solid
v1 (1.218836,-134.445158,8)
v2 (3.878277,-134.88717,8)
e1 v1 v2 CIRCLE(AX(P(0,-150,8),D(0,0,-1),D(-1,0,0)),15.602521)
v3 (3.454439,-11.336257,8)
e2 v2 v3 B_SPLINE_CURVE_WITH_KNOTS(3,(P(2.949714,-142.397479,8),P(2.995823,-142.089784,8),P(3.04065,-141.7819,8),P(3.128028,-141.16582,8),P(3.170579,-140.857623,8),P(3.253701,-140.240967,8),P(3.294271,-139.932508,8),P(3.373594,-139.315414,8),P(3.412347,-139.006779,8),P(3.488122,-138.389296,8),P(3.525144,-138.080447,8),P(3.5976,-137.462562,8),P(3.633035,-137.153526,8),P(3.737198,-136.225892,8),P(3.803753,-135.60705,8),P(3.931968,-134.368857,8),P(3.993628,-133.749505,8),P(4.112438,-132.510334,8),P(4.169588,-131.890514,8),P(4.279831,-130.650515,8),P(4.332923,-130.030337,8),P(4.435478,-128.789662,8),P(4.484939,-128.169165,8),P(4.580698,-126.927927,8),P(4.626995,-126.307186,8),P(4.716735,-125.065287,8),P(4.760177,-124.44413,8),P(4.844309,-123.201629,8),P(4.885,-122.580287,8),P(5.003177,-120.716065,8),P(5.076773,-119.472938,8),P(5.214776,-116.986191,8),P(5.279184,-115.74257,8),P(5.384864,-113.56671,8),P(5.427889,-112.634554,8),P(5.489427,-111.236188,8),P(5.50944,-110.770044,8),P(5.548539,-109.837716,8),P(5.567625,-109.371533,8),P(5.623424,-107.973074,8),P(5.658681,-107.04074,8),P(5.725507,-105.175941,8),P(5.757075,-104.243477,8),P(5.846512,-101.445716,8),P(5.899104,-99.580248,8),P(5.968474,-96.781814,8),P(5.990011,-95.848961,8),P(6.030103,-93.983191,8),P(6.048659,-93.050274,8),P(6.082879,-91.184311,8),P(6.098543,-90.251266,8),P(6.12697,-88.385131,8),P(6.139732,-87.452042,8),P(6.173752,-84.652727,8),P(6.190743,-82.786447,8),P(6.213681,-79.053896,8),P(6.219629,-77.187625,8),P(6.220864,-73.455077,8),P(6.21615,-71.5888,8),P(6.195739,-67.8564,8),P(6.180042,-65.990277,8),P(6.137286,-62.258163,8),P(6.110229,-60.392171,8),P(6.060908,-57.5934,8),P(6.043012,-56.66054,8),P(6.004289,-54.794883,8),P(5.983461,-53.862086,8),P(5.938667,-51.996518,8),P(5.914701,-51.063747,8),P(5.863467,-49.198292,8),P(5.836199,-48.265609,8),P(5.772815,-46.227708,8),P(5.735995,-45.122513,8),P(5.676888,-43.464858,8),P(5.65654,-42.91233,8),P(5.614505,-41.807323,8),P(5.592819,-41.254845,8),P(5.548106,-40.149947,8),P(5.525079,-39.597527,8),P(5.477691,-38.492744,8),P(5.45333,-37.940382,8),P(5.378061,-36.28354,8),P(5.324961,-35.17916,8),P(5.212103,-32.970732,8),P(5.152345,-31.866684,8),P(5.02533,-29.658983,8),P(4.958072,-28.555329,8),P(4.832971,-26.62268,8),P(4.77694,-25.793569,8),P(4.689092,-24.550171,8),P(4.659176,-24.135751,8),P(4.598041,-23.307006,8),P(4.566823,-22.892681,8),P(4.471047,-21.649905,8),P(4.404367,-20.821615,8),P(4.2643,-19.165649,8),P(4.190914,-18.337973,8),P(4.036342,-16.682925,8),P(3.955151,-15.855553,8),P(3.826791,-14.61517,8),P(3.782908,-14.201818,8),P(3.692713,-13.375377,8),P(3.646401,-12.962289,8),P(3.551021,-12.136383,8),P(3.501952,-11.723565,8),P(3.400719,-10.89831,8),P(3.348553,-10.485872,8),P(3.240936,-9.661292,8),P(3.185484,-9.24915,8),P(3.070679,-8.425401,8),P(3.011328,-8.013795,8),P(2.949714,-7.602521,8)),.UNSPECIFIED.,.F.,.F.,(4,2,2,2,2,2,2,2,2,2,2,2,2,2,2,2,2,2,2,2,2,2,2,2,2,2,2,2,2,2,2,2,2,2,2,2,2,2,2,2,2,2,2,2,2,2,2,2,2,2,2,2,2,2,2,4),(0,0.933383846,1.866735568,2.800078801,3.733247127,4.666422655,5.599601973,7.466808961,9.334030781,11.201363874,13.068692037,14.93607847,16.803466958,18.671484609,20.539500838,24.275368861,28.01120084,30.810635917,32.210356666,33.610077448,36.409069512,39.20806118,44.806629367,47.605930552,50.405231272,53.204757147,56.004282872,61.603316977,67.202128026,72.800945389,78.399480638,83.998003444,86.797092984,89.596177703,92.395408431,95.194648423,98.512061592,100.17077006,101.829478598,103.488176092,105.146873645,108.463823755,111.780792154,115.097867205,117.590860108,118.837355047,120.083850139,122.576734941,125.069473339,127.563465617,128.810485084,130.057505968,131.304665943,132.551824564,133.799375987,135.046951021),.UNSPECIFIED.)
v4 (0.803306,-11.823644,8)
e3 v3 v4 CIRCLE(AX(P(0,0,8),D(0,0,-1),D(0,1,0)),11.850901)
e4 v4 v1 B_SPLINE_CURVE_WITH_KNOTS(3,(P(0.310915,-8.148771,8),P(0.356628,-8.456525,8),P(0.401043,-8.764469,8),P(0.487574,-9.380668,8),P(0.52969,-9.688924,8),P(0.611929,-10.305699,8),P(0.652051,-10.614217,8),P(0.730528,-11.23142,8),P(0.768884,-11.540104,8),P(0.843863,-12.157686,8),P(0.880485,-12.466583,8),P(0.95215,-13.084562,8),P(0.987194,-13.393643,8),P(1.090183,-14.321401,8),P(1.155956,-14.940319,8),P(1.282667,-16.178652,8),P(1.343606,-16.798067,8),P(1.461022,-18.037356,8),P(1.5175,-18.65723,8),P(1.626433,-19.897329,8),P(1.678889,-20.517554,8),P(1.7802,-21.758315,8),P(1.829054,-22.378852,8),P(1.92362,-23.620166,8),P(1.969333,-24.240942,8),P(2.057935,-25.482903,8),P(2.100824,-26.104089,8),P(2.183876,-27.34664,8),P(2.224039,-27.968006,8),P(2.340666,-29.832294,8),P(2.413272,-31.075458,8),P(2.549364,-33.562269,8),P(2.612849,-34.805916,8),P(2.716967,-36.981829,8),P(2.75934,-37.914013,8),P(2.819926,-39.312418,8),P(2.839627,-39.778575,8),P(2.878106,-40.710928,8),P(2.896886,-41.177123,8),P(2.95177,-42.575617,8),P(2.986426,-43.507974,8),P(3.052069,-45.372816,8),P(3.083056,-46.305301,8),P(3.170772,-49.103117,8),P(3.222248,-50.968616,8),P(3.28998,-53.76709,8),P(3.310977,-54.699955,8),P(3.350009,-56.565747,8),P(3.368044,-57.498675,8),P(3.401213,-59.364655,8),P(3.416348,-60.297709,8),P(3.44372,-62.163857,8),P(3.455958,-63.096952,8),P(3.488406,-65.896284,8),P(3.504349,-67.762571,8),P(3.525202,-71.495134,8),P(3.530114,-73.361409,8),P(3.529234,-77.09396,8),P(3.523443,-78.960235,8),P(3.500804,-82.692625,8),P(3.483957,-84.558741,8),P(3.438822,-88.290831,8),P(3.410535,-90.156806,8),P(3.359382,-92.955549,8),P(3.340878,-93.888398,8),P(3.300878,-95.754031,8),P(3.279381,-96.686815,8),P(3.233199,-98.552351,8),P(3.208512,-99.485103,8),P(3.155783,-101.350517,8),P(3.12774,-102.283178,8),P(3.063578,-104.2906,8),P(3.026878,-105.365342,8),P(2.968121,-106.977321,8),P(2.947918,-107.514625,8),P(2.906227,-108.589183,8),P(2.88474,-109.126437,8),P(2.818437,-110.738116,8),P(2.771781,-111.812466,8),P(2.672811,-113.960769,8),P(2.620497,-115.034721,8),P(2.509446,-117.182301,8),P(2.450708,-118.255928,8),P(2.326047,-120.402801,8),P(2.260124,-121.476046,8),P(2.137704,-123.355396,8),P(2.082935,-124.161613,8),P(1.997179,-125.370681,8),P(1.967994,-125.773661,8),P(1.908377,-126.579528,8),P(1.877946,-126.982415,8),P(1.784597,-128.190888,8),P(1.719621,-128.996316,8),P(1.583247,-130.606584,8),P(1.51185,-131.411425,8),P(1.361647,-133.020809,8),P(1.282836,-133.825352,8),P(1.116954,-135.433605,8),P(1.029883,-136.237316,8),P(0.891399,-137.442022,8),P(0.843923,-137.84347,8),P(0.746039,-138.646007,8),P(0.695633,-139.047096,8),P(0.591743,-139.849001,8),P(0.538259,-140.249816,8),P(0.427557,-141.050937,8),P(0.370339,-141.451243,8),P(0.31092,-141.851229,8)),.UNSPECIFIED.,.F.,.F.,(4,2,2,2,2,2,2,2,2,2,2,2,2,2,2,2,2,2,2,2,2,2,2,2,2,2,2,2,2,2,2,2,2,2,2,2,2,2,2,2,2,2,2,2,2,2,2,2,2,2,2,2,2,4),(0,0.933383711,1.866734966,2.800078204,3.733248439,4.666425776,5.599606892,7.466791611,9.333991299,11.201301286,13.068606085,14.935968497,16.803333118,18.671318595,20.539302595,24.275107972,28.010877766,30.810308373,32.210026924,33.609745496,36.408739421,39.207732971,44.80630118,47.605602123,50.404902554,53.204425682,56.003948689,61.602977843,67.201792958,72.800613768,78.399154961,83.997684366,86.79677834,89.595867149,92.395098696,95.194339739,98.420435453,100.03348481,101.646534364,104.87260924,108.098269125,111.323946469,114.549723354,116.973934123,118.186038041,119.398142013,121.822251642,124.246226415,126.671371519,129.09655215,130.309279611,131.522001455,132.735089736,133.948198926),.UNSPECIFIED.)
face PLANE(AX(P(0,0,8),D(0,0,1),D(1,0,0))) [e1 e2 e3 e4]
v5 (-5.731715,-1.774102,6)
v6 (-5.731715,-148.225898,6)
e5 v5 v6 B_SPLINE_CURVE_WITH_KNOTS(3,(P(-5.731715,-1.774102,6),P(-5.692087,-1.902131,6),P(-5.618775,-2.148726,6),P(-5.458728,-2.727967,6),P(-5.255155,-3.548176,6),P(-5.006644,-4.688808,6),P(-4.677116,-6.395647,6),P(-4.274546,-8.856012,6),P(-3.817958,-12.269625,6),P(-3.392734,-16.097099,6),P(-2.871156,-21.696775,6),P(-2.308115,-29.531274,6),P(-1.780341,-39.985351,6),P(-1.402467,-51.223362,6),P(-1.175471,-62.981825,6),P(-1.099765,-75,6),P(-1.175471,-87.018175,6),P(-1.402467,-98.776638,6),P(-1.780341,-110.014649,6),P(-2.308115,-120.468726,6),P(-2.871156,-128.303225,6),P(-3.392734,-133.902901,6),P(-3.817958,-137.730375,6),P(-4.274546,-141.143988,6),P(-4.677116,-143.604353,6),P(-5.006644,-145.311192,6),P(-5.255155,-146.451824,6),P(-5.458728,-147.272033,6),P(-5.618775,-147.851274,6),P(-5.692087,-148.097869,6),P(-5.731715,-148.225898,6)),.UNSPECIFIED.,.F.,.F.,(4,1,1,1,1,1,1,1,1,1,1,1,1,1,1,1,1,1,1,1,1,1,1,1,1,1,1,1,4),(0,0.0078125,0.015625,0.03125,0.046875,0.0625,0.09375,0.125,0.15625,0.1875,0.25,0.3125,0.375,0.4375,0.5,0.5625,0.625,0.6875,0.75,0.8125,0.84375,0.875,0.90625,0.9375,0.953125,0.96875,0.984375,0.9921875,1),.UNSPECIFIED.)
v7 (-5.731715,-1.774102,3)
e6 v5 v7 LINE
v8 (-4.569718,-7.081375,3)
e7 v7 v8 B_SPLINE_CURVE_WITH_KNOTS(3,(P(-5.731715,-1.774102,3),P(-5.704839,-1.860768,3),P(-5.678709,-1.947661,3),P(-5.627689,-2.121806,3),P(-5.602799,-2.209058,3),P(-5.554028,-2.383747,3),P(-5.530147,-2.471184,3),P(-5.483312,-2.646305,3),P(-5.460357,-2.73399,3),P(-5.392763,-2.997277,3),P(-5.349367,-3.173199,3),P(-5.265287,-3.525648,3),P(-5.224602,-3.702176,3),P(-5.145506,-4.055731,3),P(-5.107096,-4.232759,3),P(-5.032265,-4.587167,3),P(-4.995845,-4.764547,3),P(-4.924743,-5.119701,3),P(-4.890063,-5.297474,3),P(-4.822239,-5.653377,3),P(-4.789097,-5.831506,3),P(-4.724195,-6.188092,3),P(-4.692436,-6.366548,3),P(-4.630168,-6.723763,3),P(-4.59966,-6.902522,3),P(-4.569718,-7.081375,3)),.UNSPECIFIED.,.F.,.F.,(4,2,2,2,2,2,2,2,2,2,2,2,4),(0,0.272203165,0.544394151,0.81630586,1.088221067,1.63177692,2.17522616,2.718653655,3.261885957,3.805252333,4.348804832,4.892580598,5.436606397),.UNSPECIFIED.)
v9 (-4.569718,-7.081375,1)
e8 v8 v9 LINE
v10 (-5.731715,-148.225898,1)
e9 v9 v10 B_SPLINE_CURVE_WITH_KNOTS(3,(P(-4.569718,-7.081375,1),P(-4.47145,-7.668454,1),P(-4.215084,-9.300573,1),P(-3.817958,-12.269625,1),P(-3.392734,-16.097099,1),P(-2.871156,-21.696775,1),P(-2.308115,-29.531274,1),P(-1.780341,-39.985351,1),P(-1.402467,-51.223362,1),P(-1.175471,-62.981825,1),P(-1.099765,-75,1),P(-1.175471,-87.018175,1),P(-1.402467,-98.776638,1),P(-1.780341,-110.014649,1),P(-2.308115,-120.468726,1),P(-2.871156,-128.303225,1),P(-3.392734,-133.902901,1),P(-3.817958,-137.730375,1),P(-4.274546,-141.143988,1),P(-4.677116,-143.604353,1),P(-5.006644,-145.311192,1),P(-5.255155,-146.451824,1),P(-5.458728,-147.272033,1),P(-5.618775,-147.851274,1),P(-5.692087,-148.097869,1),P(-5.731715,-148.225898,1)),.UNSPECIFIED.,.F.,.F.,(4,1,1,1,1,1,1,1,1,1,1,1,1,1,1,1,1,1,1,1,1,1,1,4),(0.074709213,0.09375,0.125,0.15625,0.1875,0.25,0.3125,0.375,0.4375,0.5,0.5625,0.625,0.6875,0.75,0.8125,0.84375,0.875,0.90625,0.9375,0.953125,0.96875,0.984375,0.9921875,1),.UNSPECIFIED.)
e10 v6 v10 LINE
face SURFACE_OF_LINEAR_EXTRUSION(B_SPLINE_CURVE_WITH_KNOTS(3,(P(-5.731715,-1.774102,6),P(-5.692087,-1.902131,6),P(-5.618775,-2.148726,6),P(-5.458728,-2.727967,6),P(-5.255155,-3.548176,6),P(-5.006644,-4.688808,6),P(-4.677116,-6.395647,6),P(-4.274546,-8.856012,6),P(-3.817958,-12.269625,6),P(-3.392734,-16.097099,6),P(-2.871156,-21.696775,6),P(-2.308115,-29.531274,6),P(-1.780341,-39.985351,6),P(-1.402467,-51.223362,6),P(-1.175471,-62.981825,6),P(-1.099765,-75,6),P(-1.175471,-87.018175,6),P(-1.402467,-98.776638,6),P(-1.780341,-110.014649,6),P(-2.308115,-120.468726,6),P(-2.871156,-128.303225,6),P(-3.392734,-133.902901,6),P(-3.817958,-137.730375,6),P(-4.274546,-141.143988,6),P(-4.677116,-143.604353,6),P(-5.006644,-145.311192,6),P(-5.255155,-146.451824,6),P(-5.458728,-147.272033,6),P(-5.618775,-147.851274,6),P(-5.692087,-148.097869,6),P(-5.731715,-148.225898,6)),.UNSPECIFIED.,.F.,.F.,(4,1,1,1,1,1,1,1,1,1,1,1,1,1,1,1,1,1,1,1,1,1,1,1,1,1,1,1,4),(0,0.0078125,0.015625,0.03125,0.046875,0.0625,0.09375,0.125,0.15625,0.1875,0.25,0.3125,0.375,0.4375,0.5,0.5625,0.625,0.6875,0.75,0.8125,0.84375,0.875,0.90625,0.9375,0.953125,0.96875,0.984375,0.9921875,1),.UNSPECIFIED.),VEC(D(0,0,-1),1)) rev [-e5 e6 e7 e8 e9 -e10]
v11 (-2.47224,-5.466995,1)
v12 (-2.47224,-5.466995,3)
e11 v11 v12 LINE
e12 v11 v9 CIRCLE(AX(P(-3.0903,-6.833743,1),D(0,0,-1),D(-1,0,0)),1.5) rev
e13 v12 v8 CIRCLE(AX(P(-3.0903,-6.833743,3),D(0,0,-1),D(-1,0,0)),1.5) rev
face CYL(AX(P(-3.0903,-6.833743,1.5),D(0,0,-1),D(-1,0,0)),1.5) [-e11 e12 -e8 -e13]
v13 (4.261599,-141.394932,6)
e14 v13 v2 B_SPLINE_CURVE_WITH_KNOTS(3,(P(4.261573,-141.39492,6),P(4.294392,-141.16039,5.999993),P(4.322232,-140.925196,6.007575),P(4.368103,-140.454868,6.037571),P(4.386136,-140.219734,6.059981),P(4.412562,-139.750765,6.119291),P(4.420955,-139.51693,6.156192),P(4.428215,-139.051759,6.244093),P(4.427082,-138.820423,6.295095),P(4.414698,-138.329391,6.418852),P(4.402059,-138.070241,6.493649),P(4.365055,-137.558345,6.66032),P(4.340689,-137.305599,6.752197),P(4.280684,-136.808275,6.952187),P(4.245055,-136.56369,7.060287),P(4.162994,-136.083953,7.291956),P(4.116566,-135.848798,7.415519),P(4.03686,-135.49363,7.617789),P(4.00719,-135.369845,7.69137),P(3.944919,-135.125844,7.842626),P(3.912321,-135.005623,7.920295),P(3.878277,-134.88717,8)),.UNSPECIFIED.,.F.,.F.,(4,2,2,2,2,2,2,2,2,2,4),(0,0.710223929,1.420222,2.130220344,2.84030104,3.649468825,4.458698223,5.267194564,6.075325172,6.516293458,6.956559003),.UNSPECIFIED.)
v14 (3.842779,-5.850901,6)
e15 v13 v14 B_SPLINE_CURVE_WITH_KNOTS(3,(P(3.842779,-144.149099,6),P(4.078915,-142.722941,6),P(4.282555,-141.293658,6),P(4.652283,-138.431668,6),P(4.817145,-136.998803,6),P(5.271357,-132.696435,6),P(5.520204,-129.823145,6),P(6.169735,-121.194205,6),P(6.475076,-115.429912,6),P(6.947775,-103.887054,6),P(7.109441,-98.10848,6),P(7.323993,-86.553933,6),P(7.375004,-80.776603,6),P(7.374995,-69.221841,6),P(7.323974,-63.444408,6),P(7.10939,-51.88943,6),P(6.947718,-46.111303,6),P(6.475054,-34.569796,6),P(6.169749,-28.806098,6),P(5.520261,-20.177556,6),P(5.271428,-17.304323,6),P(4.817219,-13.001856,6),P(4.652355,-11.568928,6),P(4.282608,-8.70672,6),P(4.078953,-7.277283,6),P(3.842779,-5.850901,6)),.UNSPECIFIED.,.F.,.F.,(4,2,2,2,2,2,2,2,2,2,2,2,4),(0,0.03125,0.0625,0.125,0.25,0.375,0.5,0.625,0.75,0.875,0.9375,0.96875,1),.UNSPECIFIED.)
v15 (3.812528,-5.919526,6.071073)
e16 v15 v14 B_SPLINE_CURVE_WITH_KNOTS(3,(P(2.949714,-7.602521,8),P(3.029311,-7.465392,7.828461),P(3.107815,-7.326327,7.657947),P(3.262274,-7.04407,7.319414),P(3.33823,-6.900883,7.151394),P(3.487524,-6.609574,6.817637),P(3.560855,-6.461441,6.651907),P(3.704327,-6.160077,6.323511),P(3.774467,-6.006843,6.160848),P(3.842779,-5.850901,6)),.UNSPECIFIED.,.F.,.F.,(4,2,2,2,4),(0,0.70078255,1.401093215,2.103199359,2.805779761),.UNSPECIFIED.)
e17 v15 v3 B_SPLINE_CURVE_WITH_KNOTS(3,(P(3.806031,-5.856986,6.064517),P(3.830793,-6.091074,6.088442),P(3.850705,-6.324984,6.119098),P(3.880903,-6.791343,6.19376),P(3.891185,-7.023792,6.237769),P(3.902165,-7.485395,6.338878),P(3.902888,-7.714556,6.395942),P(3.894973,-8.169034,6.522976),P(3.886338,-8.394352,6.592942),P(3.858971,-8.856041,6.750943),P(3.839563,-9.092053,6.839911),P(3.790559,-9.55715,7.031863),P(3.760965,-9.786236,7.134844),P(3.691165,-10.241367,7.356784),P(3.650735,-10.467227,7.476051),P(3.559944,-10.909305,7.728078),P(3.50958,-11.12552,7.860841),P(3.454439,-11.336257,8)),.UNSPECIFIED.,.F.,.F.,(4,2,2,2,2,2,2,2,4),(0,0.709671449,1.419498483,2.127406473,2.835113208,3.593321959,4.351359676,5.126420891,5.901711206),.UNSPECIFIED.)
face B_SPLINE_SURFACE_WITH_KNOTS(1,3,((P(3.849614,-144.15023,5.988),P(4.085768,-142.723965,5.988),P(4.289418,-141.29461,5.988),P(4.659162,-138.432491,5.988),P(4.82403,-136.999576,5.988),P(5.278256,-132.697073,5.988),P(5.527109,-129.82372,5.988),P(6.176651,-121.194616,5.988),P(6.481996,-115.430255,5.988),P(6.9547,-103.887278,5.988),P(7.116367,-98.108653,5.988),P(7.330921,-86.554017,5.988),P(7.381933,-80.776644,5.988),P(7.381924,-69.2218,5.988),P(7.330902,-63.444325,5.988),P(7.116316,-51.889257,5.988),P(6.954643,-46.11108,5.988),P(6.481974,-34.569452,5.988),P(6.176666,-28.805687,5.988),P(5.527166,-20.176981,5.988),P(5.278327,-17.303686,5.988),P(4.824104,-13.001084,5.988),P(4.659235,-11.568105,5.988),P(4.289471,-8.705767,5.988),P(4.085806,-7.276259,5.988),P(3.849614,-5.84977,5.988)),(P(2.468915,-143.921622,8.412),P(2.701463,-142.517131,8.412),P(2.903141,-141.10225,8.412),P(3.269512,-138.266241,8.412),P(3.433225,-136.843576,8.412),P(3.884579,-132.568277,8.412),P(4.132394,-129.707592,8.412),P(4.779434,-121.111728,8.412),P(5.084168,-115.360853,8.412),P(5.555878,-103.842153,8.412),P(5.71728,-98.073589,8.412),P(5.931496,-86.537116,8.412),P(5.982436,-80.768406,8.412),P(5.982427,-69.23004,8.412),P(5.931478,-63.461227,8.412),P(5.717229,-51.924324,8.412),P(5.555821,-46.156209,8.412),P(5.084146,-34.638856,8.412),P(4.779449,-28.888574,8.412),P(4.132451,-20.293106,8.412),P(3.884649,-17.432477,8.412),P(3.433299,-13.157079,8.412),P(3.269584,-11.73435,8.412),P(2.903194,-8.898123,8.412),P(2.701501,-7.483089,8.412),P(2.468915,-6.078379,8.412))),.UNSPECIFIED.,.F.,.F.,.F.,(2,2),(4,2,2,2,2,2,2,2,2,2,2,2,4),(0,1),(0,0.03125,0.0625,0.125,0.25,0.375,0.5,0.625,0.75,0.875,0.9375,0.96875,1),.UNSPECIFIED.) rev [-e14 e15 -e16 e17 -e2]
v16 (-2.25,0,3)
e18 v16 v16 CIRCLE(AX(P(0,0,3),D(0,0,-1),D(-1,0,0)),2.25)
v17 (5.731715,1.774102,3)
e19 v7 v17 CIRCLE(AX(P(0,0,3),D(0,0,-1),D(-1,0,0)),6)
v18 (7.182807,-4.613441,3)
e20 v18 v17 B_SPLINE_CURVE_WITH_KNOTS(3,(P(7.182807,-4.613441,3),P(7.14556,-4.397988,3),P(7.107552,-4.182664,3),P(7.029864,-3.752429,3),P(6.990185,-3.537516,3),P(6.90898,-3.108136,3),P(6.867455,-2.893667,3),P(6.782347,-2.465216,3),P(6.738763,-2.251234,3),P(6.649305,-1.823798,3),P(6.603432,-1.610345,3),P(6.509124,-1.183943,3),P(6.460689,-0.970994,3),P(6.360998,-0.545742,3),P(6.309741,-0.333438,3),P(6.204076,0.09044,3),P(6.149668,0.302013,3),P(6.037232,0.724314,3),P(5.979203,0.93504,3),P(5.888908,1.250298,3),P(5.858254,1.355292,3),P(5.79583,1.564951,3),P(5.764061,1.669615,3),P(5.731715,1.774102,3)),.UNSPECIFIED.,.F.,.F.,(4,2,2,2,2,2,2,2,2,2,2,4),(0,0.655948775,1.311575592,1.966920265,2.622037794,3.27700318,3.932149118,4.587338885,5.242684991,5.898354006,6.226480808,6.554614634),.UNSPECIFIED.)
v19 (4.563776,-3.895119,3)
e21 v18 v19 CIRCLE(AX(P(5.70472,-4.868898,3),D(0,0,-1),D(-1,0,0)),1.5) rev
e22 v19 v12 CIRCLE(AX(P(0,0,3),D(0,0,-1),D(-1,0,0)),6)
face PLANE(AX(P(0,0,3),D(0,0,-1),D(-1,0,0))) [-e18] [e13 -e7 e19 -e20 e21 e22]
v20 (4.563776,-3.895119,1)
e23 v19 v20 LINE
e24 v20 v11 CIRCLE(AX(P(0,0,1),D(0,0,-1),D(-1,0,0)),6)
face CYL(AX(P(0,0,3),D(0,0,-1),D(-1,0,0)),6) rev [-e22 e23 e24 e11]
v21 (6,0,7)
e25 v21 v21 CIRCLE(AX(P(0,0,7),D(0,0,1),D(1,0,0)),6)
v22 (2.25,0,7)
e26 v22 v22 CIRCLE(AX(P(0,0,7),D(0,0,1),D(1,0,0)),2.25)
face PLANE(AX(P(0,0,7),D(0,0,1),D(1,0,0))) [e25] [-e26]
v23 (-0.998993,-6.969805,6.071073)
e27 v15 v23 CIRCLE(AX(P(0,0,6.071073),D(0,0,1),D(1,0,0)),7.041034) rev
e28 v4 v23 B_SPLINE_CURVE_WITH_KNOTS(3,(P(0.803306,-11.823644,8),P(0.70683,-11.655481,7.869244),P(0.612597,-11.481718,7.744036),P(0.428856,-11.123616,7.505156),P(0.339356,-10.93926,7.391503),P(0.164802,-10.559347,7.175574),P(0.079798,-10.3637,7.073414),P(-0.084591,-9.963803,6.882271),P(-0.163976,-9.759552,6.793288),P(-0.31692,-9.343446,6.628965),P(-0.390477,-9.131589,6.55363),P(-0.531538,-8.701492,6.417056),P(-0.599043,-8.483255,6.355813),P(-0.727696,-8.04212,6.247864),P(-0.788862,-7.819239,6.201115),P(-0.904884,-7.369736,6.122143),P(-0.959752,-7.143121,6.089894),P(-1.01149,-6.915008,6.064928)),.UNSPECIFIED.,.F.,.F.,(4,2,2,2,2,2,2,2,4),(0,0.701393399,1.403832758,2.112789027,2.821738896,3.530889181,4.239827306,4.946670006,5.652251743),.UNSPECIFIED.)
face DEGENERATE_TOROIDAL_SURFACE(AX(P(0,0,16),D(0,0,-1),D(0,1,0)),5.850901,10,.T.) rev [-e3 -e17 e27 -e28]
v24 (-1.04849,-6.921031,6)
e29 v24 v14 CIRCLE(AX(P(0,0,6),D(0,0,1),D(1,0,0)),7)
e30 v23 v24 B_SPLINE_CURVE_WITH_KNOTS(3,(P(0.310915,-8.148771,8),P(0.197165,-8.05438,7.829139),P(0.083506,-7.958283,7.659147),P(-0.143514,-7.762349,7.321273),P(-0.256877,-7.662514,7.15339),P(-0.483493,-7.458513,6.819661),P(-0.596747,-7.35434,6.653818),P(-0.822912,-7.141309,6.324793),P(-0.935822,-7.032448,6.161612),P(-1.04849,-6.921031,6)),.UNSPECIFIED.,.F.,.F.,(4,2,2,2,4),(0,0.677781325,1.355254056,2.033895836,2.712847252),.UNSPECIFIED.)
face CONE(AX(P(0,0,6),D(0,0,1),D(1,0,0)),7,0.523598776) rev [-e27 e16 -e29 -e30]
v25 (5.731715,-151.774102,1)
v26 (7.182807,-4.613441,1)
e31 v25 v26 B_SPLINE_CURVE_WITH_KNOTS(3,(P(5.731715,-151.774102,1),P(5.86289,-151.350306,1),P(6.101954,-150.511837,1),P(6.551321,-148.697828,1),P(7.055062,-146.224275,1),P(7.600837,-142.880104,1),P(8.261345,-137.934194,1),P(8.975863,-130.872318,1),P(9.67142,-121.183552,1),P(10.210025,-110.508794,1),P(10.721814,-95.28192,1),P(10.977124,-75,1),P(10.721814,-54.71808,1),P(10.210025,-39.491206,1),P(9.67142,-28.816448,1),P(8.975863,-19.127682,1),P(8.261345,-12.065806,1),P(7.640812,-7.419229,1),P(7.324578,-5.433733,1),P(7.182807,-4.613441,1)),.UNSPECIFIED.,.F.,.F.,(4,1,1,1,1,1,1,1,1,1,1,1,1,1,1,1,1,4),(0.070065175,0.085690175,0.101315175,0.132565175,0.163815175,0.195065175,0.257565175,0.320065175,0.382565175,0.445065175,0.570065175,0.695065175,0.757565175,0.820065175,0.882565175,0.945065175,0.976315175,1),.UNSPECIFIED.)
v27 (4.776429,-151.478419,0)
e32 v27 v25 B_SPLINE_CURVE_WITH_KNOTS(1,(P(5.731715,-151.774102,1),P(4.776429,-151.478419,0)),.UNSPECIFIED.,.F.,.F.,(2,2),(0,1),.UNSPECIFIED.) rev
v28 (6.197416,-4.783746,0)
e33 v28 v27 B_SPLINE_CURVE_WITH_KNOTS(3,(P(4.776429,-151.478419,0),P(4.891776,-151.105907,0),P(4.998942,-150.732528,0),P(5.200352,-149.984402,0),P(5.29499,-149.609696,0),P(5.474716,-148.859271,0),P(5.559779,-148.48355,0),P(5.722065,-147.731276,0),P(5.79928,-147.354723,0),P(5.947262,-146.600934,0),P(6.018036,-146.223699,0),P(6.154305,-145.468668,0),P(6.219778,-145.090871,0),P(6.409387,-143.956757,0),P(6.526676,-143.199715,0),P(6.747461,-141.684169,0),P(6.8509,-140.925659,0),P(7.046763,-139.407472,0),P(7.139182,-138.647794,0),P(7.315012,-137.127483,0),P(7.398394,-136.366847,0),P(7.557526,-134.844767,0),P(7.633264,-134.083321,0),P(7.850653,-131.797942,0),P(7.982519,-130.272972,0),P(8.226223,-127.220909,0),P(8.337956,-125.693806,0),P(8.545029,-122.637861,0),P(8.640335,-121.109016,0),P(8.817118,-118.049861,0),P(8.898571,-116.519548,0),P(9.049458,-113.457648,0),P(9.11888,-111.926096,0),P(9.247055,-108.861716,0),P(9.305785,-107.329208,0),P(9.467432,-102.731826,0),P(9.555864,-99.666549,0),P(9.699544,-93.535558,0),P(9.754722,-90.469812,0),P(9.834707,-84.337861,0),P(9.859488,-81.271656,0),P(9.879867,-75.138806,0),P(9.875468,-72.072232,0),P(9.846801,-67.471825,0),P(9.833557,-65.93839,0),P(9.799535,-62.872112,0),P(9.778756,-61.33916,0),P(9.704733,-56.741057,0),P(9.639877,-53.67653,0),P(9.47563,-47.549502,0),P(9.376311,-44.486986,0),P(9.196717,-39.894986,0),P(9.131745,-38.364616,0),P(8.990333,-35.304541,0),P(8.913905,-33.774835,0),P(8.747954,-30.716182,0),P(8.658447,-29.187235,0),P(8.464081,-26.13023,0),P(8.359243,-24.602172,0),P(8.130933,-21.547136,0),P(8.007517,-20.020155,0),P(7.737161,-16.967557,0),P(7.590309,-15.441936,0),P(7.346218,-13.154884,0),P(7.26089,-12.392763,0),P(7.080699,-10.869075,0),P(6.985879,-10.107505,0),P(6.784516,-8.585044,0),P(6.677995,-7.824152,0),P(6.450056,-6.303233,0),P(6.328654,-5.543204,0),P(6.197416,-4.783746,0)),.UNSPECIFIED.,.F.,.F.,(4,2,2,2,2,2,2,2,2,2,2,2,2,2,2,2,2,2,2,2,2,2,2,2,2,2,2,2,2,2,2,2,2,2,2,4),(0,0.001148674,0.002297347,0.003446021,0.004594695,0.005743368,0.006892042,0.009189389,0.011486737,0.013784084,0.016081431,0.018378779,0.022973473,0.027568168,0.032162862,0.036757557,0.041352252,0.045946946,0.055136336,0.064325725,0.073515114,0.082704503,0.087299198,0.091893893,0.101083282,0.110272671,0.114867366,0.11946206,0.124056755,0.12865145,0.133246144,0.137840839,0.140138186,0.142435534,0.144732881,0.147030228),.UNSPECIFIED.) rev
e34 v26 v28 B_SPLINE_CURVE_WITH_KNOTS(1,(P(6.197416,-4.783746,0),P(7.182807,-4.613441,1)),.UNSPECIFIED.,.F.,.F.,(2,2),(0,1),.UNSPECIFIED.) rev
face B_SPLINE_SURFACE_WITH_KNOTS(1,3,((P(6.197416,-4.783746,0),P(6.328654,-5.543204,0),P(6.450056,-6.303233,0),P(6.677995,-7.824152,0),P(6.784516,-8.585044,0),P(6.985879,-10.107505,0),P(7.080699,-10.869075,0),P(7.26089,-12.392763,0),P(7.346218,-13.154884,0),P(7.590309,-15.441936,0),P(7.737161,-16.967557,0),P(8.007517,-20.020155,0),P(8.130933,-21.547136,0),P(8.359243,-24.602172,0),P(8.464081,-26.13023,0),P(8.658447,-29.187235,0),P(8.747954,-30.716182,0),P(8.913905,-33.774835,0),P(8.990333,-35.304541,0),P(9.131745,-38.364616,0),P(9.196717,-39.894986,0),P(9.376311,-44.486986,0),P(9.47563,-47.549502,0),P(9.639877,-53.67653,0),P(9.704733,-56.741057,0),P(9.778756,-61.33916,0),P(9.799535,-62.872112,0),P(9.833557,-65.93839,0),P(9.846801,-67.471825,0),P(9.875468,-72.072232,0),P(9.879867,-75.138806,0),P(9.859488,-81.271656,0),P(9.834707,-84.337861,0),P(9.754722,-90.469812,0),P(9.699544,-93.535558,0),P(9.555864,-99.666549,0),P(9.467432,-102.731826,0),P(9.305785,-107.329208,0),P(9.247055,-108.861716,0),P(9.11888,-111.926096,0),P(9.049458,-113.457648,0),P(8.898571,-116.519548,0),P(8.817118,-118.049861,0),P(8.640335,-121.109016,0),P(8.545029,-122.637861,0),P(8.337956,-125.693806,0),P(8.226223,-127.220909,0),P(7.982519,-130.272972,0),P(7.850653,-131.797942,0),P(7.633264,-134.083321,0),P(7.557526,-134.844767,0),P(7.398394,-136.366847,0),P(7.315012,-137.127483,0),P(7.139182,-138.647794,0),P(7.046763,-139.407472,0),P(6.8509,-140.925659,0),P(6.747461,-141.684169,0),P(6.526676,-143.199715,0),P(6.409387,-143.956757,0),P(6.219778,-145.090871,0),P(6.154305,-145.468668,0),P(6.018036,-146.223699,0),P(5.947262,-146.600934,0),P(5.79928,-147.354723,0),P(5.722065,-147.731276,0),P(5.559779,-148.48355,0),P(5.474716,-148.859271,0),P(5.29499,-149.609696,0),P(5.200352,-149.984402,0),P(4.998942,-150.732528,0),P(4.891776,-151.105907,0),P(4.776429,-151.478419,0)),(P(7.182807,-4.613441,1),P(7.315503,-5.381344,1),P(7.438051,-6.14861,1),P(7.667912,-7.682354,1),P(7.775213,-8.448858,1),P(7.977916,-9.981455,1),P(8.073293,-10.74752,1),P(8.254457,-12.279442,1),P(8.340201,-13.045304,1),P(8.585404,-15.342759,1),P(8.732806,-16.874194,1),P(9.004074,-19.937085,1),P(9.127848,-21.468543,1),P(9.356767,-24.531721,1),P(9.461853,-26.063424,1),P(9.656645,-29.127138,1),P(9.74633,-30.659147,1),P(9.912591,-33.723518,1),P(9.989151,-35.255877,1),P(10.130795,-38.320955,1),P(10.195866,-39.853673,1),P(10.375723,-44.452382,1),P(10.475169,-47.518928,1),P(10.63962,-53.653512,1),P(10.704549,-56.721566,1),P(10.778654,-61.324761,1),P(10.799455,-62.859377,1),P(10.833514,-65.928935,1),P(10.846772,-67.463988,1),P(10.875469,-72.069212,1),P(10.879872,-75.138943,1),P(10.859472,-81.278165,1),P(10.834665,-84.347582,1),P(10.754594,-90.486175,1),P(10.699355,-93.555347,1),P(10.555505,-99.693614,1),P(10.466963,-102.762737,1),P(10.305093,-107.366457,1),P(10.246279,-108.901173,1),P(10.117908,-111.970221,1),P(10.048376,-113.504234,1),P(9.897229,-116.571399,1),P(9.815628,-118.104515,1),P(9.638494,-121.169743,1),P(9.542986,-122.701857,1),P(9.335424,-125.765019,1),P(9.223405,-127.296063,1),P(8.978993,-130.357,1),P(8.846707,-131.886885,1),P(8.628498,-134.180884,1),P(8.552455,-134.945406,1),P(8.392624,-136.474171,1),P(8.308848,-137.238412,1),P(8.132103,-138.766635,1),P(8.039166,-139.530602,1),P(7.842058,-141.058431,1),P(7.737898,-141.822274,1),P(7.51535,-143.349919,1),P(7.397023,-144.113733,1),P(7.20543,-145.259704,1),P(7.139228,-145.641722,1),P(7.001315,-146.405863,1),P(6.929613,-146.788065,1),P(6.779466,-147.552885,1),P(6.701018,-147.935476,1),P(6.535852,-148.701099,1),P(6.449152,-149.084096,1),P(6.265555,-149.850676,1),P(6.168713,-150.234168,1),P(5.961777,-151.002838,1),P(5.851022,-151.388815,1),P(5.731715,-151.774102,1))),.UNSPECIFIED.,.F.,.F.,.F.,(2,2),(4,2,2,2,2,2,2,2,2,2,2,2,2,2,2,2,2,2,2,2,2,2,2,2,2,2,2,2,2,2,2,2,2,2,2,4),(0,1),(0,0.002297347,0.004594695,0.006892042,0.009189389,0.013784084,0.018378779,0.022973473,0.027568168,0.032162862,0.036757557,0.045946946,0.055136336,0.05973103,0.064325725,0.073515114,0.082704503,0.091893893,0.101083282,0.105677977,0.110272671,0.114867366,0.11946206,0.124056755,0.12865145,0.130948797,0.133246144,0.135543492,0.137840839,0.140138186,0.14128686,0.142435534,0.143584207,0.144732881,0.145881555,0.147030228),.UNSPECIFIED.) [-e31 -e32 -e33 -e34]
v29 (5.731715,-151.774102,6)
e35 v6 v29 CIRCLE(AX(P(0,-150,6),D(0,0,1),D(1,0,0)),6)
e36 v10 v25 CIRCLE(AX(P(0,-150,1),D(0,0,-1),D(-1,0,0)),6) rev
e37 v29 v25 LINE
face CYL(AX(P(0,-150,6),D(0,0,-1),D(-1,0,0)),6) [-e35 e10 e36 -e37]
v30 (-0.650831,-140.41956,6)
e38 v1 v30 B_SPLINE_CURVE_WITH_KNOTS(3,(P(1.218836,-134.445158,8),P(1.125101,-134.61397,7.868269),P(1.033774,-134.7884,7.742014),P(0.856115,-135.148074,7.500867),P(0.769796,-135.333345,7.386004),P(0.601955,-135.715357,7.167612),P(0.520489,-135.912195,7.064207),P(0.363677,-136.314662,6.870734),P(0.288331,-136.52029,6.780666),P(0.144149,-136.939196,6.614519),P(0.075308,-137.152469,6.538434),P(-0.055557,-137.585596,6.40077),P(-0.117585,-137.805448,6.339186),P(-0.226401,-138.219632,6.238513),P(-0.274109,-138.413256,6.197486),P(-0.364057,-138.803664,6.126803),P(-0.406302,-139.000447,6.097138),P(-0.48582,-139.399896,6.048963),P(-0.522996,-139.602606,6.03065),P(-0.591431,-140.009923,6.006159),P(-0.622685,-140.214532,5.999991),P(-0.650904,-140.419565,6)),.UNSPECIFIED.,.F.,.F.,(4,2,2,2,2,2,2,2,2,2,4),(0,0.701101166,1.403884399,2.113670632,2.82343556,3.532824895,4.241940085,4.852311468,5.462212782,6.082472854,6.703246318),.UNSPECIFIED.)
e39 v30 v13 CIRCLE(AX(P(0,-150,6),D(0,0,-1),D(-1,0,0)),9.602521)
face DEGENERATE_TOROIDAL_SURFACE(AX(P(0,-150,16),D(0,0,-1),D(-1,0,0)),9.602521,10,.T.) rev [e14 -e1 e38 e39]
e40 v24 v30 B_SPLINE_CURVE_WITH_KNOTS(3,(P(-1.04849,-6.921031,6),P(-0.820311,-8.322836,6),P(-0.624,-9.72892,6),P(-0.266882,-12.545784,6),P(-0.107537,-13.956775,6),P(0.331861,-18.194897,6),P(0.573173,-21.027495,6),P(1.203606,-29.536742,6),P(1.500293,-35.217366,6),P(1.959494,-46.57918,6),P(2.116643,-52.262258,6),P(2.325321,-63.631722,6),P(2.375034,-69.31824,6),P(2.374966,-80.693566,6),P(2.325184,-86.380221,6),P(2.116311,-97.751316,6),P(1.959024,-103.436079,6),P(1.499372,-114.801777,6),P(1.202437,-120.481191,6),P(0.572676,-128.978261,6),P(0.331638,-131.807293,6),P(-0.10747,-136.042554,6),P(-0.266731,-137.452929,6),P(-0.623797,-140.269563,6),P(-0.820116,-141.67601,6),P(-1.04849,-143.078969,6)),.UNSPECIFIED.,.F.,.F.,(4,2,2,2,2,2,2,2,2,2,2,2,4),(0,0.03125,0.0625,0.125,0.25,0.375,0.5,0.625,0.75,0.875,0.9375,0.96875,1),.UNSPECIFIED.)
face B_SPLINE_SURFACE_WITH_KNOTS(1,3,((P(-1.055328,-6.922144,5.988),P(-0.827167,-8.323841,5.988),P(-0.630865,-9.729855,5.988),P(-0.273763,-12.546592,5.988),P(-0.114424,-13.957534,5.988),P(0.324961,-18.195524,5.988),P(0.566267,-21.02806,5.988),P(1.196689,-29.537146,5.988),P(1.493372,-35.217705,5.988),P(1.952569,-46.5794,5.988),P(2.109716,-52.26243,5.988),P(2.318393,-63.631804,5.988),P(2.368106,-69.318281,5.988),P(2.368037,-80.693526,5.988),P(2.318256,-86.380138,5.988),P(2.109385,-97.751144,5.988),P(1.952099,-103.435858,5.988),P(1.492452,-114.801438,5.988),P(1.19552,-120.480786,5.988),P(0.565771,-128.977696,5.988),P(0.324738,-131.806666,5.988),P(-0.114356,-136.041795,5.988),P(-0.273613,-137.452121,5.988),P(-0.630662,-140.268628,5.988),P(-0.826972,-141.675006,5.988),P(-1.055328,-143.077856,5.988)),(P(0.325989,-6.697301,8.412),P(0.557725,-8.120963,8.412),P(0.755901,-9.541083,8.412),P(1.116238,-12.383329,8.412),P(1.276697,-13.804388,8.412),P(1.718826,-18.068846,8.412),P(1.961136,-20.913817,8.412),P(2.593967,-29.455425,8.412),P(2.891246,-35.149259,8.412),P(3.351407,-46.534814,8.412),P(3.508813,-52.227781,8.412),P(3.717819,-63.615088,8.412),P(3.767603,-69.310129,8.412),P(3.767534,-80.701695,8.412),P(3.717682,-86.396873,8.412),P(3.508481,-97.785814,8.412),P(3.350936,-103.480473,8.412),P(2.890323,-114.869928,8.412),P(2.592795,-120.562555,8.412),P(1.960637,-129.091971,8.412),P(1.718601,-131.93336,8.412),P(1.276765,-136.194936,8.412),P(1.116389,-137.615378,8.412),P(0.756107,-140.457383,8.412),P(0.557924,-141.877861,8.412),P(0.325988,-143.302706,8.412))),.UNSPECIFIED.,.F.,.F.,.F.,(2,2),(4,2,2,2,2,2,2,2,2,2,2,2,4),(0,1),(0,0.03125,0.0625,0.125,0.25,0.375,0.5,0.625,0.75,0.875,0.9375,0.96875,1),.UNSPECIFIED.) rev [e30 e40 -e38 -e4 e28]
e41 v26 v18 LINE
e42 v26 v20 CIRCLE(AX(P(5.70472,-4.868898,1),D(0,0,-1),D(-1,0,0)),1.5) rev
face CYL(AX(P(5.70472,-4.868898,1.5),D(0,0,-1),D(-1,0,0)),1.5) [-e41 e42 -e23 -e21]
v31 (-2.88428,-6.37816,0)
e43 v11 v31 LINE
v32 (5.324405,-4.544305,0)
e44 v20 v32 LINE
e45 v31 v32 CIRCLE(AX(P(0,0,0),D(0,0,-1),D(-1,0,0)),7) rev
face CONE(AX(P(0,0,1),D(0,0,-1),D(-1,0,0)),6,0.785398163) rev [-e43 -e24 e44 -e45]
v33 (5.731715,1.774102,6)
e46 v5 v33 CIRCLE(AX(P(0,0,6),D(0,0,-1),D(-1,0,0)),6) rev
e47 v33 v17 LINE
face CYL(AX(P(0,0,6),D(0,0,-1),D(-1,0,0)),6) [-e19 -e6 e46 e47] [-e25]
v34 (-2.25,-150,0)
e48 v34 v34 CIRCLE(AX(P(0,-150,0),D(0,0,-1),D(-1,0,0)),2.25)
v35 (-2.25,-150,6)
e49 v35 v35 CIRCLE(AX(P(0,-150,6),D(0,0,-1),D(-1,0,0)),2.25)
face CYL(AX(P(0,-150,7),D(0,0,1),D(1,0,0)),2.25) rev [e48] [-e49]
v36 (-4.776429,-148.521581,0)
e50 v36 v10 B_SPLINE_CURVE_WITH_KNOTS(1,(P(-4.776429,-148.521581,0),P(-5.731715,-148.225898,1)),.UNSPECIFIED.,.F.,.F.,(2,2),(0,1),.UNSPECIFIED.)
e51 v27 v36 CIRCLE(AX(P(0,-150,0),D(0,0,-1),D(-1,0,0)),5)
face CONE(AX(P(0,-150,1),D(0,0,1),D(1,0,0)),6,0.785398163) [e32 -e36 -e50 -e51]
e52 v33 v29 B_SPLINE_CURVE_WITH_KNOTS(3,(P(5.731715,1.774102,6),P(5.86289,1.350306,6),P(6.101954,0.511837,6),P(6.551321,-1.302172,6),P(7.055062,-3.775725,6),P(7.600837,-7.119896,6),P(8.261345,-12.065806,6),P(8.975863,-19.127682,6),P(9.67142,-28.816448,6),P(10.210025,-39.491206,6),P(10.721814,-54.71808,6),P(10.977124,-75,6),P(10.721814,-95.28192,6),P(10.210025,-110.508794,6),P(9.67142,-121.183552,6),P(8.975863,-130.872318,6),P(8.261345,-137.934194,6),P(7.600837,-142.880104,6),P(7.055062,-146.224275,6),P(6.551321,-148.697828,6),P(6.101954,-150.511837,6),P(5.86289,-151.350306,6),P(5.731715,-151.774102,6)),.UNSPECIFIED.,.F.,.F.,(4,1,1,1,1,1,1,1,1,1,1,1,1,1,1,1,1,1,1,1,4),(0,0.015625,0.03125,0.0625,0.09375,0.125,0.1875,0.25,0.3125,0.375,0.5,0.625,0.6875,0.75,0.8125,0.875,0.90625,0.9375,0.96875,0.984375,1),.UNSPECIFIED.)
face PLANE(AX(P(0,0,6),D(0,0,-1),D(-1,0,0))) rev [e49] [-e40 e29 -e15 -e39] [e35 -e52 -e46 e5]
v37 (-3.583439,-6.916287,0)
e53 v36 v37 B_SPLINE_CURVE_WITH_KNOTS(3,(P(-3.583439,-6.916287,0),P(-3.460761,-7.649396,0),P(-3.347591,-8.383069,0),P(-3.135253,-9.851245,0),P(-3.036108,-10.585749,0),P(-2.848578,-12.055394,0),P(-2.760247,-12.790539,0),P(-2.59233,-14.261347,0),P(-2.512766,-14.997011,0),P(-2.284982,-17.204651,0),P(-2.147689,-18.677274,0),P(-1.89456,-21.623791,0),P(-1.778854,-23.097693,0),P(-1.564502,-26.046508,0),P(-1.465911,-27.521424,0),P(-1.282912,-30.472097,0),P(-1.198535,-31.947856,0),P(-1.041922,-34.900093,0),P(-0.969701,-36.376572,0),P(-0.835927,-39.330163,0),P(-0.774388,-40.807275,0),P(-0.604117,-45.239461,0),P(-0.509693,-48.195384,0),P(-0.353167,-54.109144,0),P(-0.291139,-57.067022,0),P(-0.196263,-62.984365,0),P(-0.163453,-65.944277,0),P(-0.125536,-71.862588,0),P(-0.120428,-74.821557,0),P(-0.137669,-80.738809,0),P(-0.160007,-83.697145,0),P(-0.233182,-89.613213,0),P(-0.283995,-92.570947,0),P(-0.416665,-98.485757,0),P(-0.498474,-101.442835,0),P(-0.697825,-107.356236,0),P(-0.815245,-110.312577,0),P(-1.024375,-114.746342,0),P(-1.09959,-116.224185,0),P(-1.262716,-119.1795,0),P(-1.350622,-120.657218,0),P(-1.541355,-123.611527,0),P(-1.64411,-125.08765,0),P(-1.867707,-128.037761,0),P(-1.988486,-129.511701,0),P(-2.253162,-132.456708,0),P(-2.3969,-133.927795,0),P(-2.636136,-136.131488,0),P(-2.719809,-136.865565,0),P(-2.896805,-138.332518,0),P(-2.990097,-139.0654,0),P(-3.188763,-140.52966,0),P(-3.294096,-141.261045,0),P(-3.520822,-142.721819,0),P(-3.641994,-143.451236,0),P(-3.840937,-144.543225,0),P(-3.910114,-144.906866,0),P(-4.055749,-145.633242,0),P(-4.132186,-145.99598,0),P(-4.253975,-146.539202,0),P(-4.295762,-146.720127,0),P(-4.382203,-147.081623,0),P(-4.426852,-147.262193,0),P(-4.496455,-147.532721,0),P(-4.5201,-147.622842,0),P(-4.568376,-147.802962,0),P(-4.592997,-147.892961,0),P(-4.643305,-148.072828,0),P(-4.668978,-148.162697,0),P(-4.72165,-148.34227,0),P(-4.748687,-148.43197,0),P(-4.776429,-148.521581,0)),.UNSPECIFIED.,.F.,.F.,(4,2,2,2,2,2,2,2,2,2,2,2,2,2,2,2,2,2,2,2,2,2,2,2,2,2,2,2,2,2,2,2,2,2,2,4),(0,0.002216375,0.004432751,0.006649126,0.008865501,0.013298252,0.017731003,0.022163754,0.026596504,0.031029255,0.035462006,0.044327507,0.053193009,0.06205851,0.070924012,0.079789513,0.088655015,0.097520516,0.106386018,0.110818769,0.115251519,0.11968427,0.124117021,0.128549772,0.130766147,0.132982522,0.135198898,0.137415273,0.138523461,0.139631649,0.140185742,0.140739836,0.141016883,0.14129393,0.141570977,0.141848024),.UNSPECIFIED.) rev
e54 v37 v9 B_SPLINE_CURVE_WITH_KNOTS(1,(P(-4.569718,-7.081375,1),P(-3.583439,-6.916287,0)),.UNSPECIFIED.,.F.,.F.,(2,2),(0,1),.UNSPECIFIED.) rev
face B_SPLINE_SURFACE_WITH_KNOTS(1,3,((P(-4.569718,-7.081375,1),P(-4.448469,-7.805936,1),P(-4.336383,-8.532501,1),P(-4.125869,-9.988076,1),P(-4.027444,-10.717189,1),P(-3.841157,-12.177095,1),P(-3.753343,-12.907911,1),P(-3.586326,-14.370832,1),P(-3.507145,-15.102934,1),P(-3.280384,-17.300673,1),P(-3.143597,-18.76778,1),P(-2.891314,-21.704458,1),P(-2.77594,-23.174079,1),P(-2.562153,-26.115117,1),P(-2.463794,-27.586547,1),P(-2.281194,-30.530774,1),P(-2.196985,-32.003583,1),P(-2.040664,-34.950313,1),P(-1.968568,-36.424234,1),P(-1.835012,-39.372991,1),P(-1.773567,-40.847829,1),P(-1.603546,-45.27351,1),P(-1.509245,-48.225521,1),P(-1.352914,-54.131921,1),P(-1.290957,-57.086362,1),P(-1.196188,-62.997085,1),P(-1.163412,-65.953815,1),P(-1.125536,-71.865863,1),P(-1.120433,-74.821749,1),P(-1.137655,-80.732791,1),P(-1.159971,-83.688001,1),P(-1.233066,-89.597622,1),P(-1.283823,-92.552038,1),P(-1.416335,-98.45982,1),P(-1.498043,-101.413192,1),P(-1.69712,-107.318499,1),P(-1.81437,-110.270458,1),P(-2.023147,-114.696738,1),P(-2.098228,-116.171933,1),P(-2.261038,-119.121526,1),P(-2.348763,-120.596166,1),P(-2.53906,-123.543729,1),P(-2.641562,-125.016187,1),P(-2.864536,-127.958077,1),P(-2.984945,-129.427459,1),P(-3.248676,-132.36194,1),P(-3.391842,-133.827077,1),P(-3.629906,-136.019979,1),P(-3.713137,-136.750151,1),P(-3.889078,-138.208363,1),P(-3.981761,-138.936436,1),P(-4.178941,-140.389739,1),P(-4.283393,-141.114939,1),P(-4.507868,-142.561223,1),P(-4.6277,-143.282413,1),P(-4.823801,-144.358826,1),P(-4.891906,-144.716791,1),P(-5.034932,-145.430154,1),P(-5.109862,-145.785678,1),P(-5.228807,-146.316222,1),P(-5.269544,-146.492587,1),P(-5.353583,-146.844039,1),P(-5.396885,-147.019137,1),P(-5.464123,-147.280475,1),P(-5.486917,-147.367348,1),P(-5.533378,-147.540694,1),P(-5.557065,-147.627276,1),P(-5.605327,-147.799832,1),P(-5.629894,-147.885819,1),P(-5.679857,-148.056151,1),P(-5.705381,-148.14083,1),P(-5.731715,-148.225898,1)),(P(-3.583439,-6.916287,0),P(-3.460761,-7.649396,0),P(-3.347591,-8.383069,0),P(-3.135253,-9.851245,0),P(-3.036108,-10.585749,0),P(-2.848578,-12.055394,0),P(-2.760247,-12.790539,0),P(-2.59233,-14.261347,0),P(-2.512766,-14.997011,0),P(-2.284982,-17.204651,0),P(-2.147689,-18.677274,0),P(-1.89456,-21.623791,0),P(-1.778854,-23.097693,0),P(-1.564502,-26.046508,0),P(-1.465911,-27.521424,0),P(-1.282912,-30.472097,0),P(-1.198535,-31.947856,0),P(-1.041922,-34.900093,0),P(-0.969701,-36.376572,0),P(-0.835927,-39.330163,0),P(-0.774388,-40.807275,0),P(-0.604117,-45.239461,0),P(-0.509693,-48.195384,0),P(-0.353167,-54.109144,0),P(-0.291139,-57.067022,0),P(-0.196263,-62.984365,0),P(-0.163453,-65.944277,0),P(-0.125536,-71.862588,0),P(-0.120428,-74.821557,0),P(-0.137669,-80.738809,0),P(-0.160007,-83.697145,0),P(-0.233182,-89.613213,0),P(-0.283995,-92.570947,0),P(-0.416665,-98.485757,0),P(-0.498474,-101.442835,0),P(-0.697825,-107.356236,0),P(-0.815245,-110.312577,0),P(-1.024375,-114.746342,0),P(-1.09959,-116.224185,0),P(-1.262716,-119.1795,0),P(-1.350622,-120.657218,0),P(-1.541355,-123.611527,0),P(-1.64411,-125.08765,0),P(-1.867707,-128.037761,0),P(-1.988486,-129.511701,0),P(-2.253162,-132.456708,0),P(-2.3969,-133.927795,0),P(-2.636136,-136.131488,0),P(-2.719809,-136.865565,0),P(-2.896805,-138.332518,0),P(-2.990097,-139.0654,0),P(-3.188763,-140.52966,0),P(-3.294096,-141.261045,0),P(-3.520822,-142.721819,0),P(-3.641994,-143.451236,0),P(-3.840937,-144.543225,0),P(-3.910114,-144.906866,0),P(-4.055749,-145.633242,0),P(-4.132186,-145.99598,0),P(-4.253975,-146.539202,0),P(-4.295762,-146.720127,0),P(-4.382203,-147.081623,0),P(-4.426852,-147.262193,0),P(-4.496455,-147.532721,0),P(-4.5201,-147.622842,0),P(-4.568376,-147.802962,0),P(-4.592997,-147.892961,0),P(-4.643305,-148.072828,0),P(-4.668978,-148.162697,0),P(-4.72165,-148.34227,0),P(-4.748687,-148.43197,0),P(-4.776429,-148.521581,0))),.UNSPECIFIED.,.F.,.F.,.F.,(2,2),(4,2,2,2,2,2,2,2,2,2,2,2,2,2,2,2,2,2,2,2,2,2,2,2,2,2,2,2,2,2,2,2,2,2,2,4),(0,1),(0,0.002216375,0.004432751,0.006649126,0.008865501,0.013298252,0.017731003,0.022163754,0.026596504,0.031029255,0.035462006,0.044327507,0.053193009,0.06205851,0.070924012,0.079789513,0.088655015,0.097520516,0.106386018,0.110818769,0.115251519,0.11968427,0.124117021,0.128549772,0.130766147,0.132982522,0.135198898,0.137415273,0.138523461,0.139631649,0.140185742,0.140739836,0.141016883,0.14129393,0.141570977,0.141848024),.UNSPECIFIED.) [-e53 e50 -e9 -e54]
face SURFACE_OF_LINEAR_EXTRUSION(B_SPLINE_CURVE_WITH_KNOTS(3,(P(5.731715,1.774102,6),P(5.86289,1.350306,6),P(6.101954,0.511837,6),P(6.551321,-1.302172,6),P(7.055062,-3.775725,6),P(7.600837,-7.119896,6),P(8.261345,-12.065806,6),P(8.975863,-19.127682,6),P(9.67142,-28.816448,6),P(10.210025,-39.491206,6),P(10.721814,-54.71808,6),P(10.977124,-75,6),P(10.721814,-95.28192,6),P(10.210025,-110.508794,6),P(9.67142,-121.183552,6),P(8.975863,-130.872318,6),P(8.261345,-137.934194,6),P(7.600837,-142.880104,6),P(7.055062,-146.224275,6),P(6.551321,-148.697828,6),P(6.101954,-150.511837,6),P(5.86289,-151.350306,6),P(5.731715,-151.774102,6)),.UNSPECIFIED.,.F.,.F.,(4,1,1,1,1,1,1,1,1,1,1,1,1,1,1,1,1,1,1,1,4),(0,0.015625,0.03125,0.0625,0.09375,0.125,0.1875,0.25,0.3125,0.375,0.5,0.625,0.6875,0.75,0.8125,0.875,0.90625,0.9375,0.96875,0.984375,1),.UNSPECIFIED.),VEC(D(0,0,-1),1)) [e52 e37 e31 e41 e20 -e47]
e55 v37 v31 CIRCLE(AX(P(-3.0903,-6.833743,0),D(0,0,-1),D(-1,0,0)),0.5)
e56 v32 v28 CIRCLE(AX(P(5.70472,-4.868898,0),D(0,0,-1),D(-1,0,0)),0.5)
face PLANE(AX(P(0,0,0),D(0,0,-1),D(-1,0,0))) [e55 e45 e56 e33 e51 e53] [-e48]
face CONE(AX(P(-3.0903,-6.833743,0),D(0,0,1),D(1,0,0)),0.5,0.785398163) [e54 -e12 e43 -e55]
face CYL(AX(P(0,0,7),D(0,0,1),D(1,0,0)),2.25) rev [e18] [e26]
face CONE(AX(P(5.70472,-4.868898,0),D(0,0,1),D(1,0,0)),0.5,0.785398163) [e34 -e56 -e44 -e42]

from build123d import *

# Parameters (mm, degrees)
BOSS_EXTRUDE1_DEPTH  = 6
BOSS_EXTRUDE2_DEPTH  = 2
BOSS_EXTRUDE2_TAPER  = 30
SKETCH6_R            = 6
BOSS_EXTRUDE3_DEPTH  = 1
SKETCH7_R            = 6
CUT_EXTRUDE1_DEPTH   = 3
FILLET1_START        = -1
FILLET1_DEPTH        = 4
CHAMFER1_SIZE        = 1
M4_CLEARANCE_HOLE1_D = 4.5


with BuildPart() as part:
    # Sketch1 → Boss-Extrude1 (new body)
    with BuildSketch(Plane.XY):
        with BuildLine():
            ThreePointArc((-5.731715344, -1.774102368), (-1.774102368, 5.731715344), (5.731715344, 1.774102368))
            add(Edge.make_bspline(
                [(5.731715344, 1.774102368), (5.862890335, 1.350306246), (6.10195439, 0.511836894), (6.5513215, -1.302172264), (7.055062132, -3.775725238), (7.600837363, -7.119895561), (8.261344969, -12.065805628), (8.9758633, -19.127681627), (9.671419516, -28.81644754), (10.210024516, -39.49120604), (10.721813898, -54.718080156), (10.977124068, -75), (10.721813898, -95.281919844), (10.210024516, -110.50879396), (9.671419516, -121.18355246), (8.9758633, -130.872318373), (8.261344969, -137.934194372), (7.600837363, -142.880104439), (7.055062132, -146.224274762), (6.5513215, -148.697827736), (6.10195439, -150.511836894), (5.862890335, -151.350306246), (5.731715344, -151.774102368)],
                knots=[0, 0, 0, 0, 0.015625, 0.03125, 0.0625, 0.09375, 0.125, 0.1875, 0.25, 0.3125, 0.375, 0.5, 0.625, 0.6875, 0.75, 0.8125, 0.875, 0.90625, 0.9375, 0.96875, 0.984375, 1, 1, 1, 1], degree=3))
            ThreePointArc((5.731715344, -151.774102368), (-1.774102368, -155.731715344), (-5.731715344, -148.225897632))
            add(Edge.make_bspline(
                [(-5.731715344, -1.774102368), (-5.692087495, -1.902130803), (-5.618775496, -2.148725819), (-5.458728189, -2.727966614), (-5.255155063, -3.54817606), (-5.006643591, -4.688807627), (-4.677115643, -6.39564749), (-4.27454567, -8.85601244), (-3.817957958, -12.269624912), (-3.392734432, -16.09709888), (-2.871156001, -21.69677536), (-2.308115125, -29.531273979), (-1.780341203, -39.985350621), (-1.402466695, -51.223362083), (-1.175470707, -62.981825406), (-1.099764647, -75), (-1.175470707, -87.018174594), (-1.402466695, -98.776637917), (-1.780341203, -110.014649379), (-2.308115125, -120.468726021), (-2.871156001, -128.30322464), (-3.392734432, -133.90290112), (-3.817957958, -137.730375088), (-4.27454567, -141.14398756), (-4.677115643, -143.60435251), (-5.006643591, -145.311192373), (-5.255155063, -146.45182394), (-5.458728189, -147.272033386), (-5.618775496, -147.851274181), (-5.692087495, -148.097869197), (-5.731715344, -148.225897632)],
                knots=[0, 0, 0, 0, 0.0078125, 0.015625, 0.03125, 0.046875, 0.0625, 0.09375, 0.125, 0.15625, 0.1875, 0.25, 0.3125, 0.375, 0.4375, 0.5, 0.5625, 0.625, 0.6875, 0.75, 0.8125, 0.84375, 0.875, 0.90625, 0.9375, 0.953125, 0.96875, 0.984375, 0.9921875, 1, 1, 1, 1], degree=3))
        make_face()
    extrude(amount=BOSS_EXTRUDE1_DEPTH)

    # Sketch2 → Boss-Extrude2 (add)
    with BuildSketch(Plane.XY.offset(6)):
        with BuildLine():
            add(Edge.make_bspline(
                [(3.842779218, -144.149098541), (3.99518889, -143.228609095), (4.133577932, -142.306808915), (4.482341024, -139.816291581), (4.674300588, -138.24585293), (5.022834622, -135.101667614), (5.179034802, -133.527885959), (5.608568883, -128.802888823), (5.843693204, -125.648101279), (6.249577099, -119.332508984), (6.419662658, -116.171641222), (6.857535334, -106.68227104), (7.05432563, -100.34499664), (7.313633365, -87.672679841), (7.436364195, -75.000225736), (7.313637964, -62.327524864), (7.05431874, -49.65468667), (6.857549017, -43.318319211), (6.419745963, -33.830017305), (6.249687473, -30.669449522), (5.843863318, -24.354304808), (5.608771942, -21.1996664), (5.179285888, -16.474715495), (5.023101498, -14.900919175), (4.67459471, -11.756621418), (4.482646895, -10.186085829), (4.133804085, -7.694692501), (3.995316322, -6.772156482), (3.842779302, -5.850901403)],
                knots=[0.044109896, 0.044109896, 0.044109896, 0.044109896, 0.0625, 0.0625, 0.09375, 0.09375, 0.125, 0.125, 0.1875, 0.1875, 0.25, 0.25, 0.375, 0.375, 0.5, 0.625, 0.625, 0.75, 0.75, 0.8125, 0.8125, 0.875, 0.875, 0.90625, 0.90625, 0.9375, 0.9375, 0.955902495, 0.955902495, 0.955902495, 0.955902495], degree=3))
            ThreePointArc((3.842779302, -5.850901403), (1.496097545, -6.838252126), (-1.048489728, -6.921030941))
            add(Edge.make_bspline(
                [(-1.048489728, -6.921030941), (-0.887726028, -7.908676873), (-0.743269436, -8.898495118), (-0.400727329, -11.426505037), (-0.218072452, -12.966752267), (0.114129955, -16.051657047), (0.263395019, -17.596352224), (0.674511995, -22.235323757), (0.900378843, -25.335536499), (1.290535741, -31.537230608), (1.454172696, -34.639030666), (1.875705513, -43.946533714), (2.065405192, -50.154303756), (2.315616461, -62.573759578), (2.374993429, -68.785688578), (2.37500657, -81.21228644), (2.315647979, -87.424382498), (2.065406806, -99.845909639), (1.875647227, -106.055756994), (1.453897372, -115.3665461), (1.290239744, -118.467676771), (0.900441737, -124.663261276), (0.675011926, -127.757791041), (0.264495235, -132.3918521), (0.115436706, -133.935233344), (-0.216369082, -137.018395892), (-0.398831003, -138.558207687), (-0.741756199, -141.091163775), (-0.886846381, -142.085950818), (-1.048489537, -143.07896903)],
                knots=[0.042345585, 0.042345585, 0.042345585, 0.042345585, 0.0625, 0.0625, 0.09375, 0.09375, 0.125, 0.125, 0.1875, 0.1875, 0.25, 0.25, 0.375, 0.375, 0.5, 0.5, 0.625, 0.625, 0.75, 0.75, 0.8125, 0.8125, 0.875, 0.875, 0.90625, 0.90625, 0.9375, 0.9375, 0.957747168, 0.957747168, 0.957747168, 0.957747168], degree=3))
            ThreePointArc((-1.048489537, -143.07896903), (1.49609759, -143.161747884), (3.842779218, -144.149098541))
        make_face()
    extrude(amount=BOSS_EXTRUDE2_DEPTH, taper=BOSS_EXTRUDE2_TAPER)

    # Sketch5 → Cut-Revolve1 (revolve, cut)
    with BuildSketch(Plane(origin=(0, 0, 0), x_dir=(0, 0, -1), z_dir=(1, 0, 0))):
        with BuildLine():
            ThreePointArc((-6, -140.397478747), (-6.513167019, -137.235201087), (-8, -134.397478747))
            Line((-8, -134.397478747), (-8, -142.397478747))
            Line((-8, -142.397478747), (-6, -144.149098541))
            Line((-6, -144.149098541), (-6, -140.397478747))
        make_face()
    revolve(axis=Axis((0, -150, 0), (0, 0, 1)), mode=Mode.SUBTRACT)

    # Sketch5<4> → Cut-Revolve2 (revolve, cut)
    with BuildSketch(Plane(origin=(0, 0, 0), x_dir=(0, 0, -1), z_dir=(1, 0, 0))):
        with BuildLine():
            Line((-8, -7.602521037), (-6, -5.850901403))
            ThreePointArc((-6, -5.850901403), (-6.513167019, -9.013179064), (-8, -11.850901403))
            Line((-8, -11.850901403), (-8, -7.602521037))
        make_face()
    revolve(axis=Axis((0, 0, 0), (0, 0, 1)), mode=Mode.SUBTRACT)

    # Sketch6 → Boss-Extrude3 (add)
    with BuildSketch(Plane.XY.offset(6)):
        with Locations(Location((0, 0, 0), (0, 0, 197.19854122))):
            Circle(SKETCH6_R)
    extrude(amount=BOSS_EXTRUDE3_DEPTH)

    # Sketch7 → Cut-Extrude1 (cut)
    with BuildSketch(Plane(origin=(0, 0, 0), x_dir=(-1, 0, 0), z_dir=(0, 0, -1))):
        with Locations(Location((0, 0, 0), (0, 0, 342.80145878))):
            Circle(SKETCH7_R)
    extrude(amount=-CUT_EXTRUDE1_DEPTH, mode=Mode.SUBTRACT)

    # Fillet1: read off the stored shape, not the designer's step
    # Fillet1 outline → Fillet1 (cut)
    with BuildSketch(Plane.XY.offset(FILLET1_START)):
        with BuildLine():
            add(Edge.make_bspline(
                [(-5.731715344, -1.774102368), (-5.692087495, -1.902130803), (-5.618775496, -2.148725819), (-5.458728189, -2.727966614), (-5.255155063, -3.54817606), (-5.006643591, -4.688807627), (-4.777507184, -5.875654311), (-4.632728696, -6.704930928), (-4.56971799, -7.081374578)],
                knots=[0, 0, 0, 0, 0.0078125, 0.015625, 0.03125, 0.046875, 0.0625, 0.074709213, 0.074709213, 0.074709213, 0.074709213], degree=3))
            ThreePointArc((-4.56971799, -7.081374578), (-4.005198612, -5.645063514), (-2.472239677, -5.466994694))
            ThreePointArc((-2.472239677, -5.466994694), (-4.498397818, -3.970442931), (-5.731715344, -1.774102368))
        make_face()
        with BuildLine():
            ThreePointArc((5.731715344, 1.774102368), (5.876589294, -1.210660261), (4.563775855, -3.895118733))
            ThreePointArc((4.563775855, -3.895118733), (6.101473007, -3.422320762), (7.182806929, -4.613440991))
            add(Edge.make_bspline(
                [(5.731715344, 1.774102368), (5.862890335, 1.350306246), (6.10195439, 0.511836894), (6.5513215, -1.302172264), (6.902345222, -3.025828681), (7.137523842, -4.351431198), (7.182806929, -4.613440991)],
                knots=[0, 0, 0, 0, 0.015625, 0.03125, 0.0625, 0.070065175, 0.070065175, 0.070065175, 0.070065175], degree=3))
        make_face()
    extrude(amount=FILLET1_DEPTH, mode=Mode.SUBTRACT)

    # Chamfer1
    chamfer1_edges = [part.edges().sort_by_distance(p)[0] for p in [
        (-1.128874241, -77.718314318, 0),
        (-1.774102368, -155.731715344, 0),
        (10.869440998, -78.27732173, 0),
        (-4.005198612, -5.645063514, 0),
        (1.308177895, -5.855652875, 0),
        (6.101473007, -3.422320762, 0),
    ]]
    chamfer(chamfer1_edges, length=CHAMFER1_SIZE)

    # M4 Clearance Hole1 (through all)
    with Locations(Plane.XY.offset(7)):
        with Locations((0, 0), (0, -150)):
            Hole(M4_CLEARANCE_HOLE1_D / 2)


solid = part.part
